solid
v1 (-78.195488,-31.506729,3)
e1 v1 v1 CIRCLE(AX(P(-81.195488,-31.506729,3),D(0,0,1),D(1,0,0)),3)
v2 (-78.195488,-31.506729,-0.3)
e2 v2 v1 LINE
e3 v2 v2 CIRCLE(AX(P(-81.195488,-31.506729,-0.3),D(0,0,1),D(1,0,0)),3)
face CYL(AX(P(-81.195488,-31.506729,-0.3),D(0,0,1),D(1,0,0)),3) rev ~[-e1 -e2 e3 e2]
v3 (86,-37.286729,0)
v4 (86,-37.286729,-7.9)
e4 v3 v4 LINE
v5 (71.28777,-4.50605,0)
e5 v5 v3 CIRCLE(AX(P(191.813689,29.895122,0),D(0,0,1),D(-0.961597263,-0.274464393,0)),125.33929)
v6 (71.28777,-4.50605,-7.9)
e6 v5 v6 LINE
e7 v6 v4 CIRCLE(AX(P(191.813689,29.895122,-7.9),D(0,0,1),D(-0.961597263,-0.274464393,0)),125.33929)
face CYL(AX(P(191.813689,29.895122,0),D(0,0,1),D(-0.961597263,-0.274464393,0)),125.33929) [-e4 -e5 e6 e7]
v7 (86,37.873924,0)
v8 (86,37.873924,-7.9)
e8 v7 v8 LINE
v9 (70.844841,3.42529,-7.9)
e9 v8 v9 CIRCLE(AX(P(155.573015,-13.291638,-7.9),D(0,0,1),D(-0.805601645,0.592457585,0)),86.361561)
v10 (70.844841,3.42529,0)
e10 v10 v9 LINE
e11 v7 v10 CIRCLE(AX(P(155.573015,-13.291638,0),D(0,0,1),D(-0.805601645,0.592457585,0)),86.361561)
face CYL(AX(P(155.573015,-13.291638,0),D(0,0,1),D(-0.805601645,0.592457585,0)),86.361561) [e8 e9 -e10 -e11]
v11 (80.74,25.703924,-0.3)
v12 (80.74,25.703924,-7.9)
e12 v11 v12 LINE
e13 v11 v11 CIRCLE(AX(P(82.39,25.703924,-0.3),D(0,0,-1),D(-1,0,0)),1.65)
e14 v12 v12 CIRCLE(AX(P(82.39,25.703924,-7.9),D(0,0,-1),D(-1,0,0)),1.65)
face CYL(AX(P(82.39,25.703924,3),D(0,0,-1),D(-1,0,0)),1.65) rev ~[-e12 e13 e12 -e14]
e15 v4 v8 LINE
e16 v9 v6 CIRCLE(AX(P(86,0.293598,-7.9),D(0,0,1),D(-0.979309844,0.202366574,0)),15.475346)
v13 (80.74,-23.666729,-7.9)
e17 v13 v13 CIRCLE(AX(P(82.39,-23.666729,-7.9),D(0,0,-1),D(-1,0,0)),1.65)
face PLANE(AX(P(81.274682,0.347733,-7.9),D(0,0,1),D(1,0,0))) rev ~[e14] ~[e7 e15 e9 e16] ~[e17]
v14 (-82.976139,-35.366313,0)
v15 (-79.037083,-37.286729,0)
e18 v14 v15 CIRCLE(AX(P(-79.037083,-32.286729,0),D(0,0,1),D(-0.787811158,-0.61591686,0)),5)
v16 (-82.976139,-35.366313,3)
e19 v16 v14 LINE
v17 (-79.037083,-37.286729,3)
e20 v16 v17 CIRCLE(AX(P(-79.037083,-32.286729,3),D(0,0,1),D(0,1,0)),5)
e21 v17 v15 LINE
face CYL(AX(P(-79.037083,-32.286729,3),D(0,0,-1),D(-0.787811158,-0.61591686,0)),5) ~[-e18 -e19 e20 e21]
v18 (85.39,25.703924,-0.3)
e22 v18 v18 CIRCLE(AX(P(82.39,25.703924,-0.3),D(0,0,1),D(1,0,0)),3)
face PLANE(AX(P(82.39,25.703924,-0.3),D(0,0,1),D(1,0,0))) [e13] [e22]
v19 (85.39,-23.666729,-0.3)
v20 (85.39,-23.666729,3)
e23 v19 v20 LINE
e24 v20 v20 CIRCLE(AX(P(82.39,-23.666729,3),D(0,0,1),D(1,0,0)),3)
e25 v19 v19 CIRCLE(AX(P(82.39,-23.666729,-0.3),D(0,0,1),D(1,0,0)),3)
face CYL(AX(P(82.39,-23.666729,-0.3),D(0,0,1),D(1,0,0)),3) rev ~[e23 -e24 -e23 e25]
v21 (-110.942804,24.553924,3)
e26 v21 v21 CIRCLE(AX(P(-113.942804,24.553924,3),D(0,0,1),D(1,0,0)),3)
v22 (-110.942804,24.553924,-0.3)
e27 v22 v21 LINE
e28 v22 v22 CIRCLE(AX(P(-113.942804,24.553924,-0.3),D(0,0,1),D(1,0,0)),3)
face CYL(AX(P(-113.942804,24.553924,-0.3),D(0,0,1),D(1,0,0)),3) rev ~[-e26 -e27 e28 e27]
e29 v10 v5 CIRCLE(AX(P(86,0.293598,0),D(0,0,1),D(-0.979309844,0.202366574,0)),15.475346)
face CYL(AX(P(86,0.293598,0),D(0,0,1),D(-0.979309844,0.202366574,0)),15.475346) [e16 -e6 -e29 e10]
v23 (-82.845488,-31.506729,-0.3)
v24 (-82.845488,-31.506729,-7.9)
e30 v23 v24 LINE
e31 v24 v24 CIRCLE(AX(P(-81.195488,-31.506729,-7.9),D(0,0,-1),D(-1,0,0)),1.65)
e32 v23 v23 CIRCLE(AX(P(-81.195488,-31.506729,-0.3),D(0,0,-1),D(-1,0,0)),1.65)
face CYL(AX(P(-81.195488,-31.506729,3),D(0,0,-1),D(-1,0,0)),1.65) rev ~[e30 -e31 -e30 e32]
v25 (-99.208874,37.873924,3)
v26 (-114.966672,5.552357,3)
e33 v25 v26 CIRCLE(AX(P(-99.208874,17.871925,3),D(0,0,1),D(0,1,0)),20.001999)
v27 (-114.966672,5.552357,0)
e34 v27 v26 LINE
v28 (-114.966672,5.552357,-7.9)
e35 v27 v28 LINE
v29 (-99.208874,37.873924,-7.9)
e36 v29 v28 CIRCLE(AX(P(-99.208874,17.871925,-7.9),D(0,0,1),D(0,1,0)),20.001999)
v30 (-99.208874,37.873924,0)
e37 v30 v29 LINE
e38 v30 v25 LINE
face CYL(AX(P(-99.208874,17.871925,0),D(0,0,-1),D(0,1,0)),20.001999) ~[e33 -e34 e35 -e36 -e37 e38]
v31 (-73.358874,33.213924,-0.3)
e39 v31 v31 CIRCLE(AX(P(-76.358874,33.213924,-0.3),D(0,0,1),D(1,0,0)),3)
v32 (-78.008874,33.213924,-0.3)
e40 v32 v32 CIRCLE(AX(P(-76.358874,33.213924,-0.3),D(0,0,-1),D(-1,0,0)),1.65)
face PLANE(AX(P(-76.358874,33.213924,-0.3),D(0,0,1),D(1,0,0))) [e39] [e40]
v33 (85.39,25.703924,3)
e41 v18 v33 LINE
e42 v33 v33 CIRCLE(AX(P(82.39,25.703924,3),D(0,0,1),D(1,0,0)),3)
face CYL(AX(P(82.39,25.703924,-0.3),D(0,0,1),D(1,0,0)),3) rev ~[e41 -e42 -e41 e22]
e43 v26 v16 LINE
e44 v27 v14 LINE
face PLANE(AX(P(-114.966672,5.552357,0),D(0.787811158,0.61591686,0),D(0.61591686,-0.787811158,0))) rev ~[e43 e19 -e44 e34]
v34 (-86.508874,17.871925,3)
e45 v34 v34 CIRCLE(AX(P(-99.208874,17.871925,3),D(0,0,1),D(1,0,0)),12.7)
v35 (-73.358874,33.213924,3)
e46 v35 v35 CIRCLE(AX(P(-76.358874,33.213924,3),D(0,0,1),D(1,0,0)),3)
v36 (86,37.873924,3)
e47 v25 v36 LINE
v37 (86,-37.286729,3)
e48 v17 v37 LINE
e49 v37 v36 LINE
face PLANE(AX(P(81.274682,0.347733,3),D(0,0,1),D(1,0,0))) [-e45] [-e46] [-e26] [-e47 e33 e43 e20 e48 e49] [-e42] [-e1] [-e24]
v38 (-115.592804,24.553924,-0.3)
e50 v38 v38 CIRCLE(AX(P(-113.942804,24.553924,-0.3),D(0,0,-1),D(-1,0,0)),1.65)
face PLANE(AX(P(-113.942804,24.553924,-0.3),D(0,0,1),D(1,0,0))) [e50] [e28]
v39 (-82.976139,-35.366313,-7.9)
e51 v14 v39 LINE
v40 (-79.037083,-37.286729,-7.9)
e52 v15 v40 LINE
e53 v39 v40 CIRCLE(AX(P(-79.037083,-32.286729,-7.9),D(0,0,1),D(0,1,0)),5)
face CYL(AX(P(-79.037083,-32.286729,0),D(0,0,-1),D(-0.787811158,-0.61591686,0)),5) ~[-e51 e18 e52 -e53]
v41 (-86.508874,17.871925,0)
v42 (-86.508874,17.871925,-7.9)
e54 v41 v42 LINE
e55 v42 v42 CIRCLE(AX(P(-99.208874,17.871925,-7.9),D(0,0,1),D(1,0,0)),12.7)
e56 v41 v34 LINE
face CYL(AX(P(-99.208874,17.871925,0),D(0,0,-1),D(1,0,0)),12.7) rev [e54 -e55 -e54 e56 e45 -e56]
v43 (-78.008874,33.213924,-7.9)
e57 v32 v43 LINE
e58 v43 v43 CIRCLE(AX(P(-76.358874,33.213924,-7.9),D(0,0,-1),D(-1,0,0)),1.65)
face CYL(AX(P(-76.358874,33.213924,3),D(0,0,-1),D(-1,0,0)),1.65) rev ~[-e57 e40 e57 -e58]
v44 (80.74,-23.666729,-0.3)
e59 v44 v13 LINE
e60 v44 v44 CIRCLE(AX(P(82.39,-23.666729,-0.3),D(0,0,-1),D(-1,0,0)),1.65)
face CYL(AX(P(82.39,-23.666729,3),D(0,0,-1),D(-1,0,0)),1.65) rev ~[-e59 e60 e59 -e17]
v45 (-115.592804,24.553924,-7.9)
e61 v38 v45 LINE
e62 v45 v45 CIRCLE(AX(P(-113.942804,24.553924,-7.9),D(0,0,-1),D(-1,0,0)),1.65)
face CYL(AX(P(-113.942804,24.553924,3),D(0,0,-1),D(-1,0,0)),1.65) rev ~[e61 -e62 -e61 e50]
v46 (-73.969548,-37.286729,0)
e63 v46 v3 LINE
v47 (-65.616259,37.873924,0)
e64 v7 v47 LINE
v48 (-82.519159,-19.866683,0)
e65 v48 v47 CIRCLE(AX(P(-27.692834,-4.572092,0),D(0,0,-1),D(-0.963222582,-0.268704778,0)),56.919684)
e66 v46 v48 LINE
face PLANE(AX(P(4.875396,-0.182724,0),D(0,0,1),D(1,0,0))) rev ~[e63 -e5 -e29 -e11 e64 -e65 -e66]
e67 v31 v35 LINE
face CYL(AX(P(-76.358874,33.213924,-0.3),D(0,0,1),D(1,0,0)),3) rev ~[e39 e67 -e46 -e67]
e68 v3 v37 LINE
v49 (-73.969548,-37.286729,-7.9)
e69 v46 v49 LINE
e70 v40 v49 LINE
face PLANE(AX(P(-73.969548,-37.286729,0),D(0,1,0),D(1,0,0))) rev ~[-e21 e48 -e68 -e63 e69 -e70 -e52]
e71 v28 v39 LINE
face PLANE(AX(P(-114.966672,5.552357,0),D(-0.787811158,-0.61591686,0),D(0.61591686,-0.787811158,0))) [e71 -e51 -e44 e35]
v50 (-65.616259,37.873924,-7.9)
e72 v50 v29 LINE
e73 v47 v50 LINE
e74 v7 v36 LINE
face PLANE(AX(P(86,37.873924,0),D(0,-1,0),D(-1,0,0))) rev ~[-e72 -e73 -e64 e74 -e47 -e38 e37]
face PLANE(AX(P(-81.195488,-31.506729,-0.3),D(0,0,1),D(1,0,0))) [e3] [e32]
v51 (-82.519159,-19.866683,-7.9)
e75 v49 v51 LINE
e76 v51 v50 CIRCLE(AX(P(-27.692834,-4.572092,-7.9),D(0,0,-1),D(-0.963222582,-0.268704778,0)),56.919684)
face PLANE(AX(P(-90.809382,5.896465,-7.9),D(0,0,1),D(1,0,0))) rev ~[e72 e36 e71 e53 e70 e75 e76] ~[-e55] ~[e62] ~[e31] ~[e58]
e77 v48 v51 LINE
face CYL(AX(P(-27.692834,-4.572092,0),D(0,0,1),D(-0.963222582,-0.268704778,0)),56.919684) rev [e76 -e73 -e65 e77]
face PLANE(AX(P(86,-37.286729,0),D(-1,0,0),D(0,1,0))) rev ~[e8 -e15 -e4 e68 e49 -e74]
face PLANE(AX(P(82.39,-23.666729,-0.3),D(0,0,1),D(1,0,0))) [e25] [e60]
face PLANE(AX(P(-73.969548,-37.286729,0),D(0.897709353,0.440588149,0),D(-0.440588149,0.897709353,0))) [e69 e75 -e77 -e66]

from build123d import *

# Parameters (mm, degrees)
F0_R           = 12.7
F1_DEPTH       = 7.9
F1_FACE_R      = 12.7
F2_DEPTH       = 3
F3_DEPTH       = 3
F4_R           = 5
F8_D           = 3.3
F8_CBORE_D     = 6
F8_CBORE_DEPTH = 3.3


# Not quite as in the source:
# - a feature names something its author has since deleted; it is built from what else it names


with BuildPart() as f1:
    # F0 (on Top) → F1 (new body)
    with BuildSketch(Plane.XY):
        with BuildLine():
            ThreePointArc((-82.519158721, -19.8666825891), (-82.3199649398, 11.4193737584), (-65.6162592679, 37.8739237785))
            Line((-65.6162592679, 37.8739237785), (-99.2088739193, 37.8739237785))
            ThreePointArc((-99.2088739193, 37.8739237785), (-117.1879721114, 26.6373104948), (-114.9666717313, 5.5523567478))
            Line((-114.9666717313, 5.5523567478), (-81.4747432756, -37.2867286205))
            Line((-81.4747432756, -37.2867286205), (-73.9695476283, -37.2867286205))
            Line((-73.9695476283, -37.2867286205), (-82.519158721, -19.8666825891))
        make_face()
        with Locations((-99.2088739193, 17.8719250206)):
            Circle(F0_R, mode=Mode.SUBTRACT)
    extrude(amount=-F1_DEPTH)



with BuildPart() as f1b:
    # F0 (on Top) → F1, piece 2 (new body)
    with BuildSketch(Plane.XY):
        with BuildLine():
            Line((86, -37.2867286205), (86, 37.8739237785))
            ThreePointArc((86, 37.8739237785), (76.5230858808, 21.4851908555), (70.8448413014, 3.4252903424))
            ThreePointArc((70.8448413014, 3.4252903424), (70.5487291916, -0.5692843065), (71.2877699379, -4.5060504646))
            ThreePointArc((71.2877699379, -4.5060504646), (77.4631412951, -21.4263167299), (86, -37.2867286205))
        make_face()
    extrude(amount=-F1_DEPTH)


with BuildPart() as f1_1:
    add(f1.part)

    add(f1b.part)  # F2 merges F1b
    # F0 (on Top) + F1_face (on face) → F2 (join)
    with BuildSketch(Plane.XY):
        with BuildLine():
            ThreePointArc((70.8448413014, 3.4252903424), (76.5230858808, 21.4851908555), (86, 37.8739237785))
            Line((86, 37.8739237785), (-65.6162592679, 37.8739237785))
            ThreePointArc((-65.6162592679, 37.8739237785), (-82.3199649398, 11.4193737584), (-82.519158721, -19.8666825891))
            Line((-82.519158721, -19.8666825891), (-73.9695476283, -37.2867286205))
            Line((-73.9695476283, -37.2867286205), (86, -37.2867286205))
            ThreePointArc((86, -37.2867286205), (77.4631412951, -21.4263167299), (71.2877699379, -4.5060504646))
            ThreePointArc((71.2877699379, -4.5060504646), (70.5487291916, -0.5692843065), (70.8448413014, 3.4252903424))
        make_face()
    with BuildSketch(Plane(origin=(-93.510683798, 7.7887517246, 0), x_dir=(1, 0, 0), z_dir=(0, 0, 1))):
        with BuildLine():
            ThreePointArc((10.9915250771, -27.6554343137), (11.1907188583, 3.6306220338), (27.8944245301, 30.0851720539))
            Line((27.8944245301, 30.0851720539), (-5.6981901212, 30.0851720539))
            ThreePointArc((-5.6981901212, 30.0851720539), (-23.6772883134, 18.8485587701), (-21.4559879333, -2.2363949769))
            Line((-21.4559879333, -2.2363949769), (12.0359405224, -45.0754803451))
            Line((12.0359405224, -45.0754803451), (19.5411361698, -45.0754803451))
            Line((19.5411361698, -45.0754803451), (10.9915250771, -27.6554343137))
        make_face()
        with Locations((-5.6981901212, 10.083173296)):
            Circle(F1_FACE_R, mode=Mode.SUBTRACT)
    extrude(amount=F2_DEPTH)

    # F4
    f4_edges = [f1_1.edges().sort_by_distance(p)[0] for p in [
        (-81.474743, -37.286729, -2.45),
    ]]
    fillet(f4_edges, radius=F4_R)


with BuildPart() as f3:
    # F0 (on Top) → F3 (new body)
    with BuildSketch(Plane.XY):
        with BuildLine():
            Line((86, -37.2867286205), (86, 37.8739237785))
            ThreePointArc((86, 37.8739237785), (76.5230858808, 21.4851908555), (70.8448413014, 3.4252903424))
            ThreePointArc((70.8448413014, 3.4252903424), (70.5487291916, -0.5692843065), (71.2877699379, -4.5060504646))
            ThreePointArc((71.2877699379, -4.5060504646), (77.4631412951, -21.4263167299), (86, -37.2867286205))
        make_face()
    extrude(amount=F3_DEPTH)


with BuildPart() as f1_2:
    add(f1_1.part)

    # F6: union F3
    add(f3.part)

    # F8 (through all)
    with Locations(Plane.XY.offset(3)):
        with Locations((-76.3588739193, 33.2139237785), (-113.9428039086, 24.5539237785), (-81.1954878403, -31.5067286205), (82.39, -23.6667286205), (82.39, 25.7039237785)):
            CounterBoreHole(F8_D / 2, F8_CBORE_D / 2, F8_CBORE_DEPTH)


solid = f1_2.part
